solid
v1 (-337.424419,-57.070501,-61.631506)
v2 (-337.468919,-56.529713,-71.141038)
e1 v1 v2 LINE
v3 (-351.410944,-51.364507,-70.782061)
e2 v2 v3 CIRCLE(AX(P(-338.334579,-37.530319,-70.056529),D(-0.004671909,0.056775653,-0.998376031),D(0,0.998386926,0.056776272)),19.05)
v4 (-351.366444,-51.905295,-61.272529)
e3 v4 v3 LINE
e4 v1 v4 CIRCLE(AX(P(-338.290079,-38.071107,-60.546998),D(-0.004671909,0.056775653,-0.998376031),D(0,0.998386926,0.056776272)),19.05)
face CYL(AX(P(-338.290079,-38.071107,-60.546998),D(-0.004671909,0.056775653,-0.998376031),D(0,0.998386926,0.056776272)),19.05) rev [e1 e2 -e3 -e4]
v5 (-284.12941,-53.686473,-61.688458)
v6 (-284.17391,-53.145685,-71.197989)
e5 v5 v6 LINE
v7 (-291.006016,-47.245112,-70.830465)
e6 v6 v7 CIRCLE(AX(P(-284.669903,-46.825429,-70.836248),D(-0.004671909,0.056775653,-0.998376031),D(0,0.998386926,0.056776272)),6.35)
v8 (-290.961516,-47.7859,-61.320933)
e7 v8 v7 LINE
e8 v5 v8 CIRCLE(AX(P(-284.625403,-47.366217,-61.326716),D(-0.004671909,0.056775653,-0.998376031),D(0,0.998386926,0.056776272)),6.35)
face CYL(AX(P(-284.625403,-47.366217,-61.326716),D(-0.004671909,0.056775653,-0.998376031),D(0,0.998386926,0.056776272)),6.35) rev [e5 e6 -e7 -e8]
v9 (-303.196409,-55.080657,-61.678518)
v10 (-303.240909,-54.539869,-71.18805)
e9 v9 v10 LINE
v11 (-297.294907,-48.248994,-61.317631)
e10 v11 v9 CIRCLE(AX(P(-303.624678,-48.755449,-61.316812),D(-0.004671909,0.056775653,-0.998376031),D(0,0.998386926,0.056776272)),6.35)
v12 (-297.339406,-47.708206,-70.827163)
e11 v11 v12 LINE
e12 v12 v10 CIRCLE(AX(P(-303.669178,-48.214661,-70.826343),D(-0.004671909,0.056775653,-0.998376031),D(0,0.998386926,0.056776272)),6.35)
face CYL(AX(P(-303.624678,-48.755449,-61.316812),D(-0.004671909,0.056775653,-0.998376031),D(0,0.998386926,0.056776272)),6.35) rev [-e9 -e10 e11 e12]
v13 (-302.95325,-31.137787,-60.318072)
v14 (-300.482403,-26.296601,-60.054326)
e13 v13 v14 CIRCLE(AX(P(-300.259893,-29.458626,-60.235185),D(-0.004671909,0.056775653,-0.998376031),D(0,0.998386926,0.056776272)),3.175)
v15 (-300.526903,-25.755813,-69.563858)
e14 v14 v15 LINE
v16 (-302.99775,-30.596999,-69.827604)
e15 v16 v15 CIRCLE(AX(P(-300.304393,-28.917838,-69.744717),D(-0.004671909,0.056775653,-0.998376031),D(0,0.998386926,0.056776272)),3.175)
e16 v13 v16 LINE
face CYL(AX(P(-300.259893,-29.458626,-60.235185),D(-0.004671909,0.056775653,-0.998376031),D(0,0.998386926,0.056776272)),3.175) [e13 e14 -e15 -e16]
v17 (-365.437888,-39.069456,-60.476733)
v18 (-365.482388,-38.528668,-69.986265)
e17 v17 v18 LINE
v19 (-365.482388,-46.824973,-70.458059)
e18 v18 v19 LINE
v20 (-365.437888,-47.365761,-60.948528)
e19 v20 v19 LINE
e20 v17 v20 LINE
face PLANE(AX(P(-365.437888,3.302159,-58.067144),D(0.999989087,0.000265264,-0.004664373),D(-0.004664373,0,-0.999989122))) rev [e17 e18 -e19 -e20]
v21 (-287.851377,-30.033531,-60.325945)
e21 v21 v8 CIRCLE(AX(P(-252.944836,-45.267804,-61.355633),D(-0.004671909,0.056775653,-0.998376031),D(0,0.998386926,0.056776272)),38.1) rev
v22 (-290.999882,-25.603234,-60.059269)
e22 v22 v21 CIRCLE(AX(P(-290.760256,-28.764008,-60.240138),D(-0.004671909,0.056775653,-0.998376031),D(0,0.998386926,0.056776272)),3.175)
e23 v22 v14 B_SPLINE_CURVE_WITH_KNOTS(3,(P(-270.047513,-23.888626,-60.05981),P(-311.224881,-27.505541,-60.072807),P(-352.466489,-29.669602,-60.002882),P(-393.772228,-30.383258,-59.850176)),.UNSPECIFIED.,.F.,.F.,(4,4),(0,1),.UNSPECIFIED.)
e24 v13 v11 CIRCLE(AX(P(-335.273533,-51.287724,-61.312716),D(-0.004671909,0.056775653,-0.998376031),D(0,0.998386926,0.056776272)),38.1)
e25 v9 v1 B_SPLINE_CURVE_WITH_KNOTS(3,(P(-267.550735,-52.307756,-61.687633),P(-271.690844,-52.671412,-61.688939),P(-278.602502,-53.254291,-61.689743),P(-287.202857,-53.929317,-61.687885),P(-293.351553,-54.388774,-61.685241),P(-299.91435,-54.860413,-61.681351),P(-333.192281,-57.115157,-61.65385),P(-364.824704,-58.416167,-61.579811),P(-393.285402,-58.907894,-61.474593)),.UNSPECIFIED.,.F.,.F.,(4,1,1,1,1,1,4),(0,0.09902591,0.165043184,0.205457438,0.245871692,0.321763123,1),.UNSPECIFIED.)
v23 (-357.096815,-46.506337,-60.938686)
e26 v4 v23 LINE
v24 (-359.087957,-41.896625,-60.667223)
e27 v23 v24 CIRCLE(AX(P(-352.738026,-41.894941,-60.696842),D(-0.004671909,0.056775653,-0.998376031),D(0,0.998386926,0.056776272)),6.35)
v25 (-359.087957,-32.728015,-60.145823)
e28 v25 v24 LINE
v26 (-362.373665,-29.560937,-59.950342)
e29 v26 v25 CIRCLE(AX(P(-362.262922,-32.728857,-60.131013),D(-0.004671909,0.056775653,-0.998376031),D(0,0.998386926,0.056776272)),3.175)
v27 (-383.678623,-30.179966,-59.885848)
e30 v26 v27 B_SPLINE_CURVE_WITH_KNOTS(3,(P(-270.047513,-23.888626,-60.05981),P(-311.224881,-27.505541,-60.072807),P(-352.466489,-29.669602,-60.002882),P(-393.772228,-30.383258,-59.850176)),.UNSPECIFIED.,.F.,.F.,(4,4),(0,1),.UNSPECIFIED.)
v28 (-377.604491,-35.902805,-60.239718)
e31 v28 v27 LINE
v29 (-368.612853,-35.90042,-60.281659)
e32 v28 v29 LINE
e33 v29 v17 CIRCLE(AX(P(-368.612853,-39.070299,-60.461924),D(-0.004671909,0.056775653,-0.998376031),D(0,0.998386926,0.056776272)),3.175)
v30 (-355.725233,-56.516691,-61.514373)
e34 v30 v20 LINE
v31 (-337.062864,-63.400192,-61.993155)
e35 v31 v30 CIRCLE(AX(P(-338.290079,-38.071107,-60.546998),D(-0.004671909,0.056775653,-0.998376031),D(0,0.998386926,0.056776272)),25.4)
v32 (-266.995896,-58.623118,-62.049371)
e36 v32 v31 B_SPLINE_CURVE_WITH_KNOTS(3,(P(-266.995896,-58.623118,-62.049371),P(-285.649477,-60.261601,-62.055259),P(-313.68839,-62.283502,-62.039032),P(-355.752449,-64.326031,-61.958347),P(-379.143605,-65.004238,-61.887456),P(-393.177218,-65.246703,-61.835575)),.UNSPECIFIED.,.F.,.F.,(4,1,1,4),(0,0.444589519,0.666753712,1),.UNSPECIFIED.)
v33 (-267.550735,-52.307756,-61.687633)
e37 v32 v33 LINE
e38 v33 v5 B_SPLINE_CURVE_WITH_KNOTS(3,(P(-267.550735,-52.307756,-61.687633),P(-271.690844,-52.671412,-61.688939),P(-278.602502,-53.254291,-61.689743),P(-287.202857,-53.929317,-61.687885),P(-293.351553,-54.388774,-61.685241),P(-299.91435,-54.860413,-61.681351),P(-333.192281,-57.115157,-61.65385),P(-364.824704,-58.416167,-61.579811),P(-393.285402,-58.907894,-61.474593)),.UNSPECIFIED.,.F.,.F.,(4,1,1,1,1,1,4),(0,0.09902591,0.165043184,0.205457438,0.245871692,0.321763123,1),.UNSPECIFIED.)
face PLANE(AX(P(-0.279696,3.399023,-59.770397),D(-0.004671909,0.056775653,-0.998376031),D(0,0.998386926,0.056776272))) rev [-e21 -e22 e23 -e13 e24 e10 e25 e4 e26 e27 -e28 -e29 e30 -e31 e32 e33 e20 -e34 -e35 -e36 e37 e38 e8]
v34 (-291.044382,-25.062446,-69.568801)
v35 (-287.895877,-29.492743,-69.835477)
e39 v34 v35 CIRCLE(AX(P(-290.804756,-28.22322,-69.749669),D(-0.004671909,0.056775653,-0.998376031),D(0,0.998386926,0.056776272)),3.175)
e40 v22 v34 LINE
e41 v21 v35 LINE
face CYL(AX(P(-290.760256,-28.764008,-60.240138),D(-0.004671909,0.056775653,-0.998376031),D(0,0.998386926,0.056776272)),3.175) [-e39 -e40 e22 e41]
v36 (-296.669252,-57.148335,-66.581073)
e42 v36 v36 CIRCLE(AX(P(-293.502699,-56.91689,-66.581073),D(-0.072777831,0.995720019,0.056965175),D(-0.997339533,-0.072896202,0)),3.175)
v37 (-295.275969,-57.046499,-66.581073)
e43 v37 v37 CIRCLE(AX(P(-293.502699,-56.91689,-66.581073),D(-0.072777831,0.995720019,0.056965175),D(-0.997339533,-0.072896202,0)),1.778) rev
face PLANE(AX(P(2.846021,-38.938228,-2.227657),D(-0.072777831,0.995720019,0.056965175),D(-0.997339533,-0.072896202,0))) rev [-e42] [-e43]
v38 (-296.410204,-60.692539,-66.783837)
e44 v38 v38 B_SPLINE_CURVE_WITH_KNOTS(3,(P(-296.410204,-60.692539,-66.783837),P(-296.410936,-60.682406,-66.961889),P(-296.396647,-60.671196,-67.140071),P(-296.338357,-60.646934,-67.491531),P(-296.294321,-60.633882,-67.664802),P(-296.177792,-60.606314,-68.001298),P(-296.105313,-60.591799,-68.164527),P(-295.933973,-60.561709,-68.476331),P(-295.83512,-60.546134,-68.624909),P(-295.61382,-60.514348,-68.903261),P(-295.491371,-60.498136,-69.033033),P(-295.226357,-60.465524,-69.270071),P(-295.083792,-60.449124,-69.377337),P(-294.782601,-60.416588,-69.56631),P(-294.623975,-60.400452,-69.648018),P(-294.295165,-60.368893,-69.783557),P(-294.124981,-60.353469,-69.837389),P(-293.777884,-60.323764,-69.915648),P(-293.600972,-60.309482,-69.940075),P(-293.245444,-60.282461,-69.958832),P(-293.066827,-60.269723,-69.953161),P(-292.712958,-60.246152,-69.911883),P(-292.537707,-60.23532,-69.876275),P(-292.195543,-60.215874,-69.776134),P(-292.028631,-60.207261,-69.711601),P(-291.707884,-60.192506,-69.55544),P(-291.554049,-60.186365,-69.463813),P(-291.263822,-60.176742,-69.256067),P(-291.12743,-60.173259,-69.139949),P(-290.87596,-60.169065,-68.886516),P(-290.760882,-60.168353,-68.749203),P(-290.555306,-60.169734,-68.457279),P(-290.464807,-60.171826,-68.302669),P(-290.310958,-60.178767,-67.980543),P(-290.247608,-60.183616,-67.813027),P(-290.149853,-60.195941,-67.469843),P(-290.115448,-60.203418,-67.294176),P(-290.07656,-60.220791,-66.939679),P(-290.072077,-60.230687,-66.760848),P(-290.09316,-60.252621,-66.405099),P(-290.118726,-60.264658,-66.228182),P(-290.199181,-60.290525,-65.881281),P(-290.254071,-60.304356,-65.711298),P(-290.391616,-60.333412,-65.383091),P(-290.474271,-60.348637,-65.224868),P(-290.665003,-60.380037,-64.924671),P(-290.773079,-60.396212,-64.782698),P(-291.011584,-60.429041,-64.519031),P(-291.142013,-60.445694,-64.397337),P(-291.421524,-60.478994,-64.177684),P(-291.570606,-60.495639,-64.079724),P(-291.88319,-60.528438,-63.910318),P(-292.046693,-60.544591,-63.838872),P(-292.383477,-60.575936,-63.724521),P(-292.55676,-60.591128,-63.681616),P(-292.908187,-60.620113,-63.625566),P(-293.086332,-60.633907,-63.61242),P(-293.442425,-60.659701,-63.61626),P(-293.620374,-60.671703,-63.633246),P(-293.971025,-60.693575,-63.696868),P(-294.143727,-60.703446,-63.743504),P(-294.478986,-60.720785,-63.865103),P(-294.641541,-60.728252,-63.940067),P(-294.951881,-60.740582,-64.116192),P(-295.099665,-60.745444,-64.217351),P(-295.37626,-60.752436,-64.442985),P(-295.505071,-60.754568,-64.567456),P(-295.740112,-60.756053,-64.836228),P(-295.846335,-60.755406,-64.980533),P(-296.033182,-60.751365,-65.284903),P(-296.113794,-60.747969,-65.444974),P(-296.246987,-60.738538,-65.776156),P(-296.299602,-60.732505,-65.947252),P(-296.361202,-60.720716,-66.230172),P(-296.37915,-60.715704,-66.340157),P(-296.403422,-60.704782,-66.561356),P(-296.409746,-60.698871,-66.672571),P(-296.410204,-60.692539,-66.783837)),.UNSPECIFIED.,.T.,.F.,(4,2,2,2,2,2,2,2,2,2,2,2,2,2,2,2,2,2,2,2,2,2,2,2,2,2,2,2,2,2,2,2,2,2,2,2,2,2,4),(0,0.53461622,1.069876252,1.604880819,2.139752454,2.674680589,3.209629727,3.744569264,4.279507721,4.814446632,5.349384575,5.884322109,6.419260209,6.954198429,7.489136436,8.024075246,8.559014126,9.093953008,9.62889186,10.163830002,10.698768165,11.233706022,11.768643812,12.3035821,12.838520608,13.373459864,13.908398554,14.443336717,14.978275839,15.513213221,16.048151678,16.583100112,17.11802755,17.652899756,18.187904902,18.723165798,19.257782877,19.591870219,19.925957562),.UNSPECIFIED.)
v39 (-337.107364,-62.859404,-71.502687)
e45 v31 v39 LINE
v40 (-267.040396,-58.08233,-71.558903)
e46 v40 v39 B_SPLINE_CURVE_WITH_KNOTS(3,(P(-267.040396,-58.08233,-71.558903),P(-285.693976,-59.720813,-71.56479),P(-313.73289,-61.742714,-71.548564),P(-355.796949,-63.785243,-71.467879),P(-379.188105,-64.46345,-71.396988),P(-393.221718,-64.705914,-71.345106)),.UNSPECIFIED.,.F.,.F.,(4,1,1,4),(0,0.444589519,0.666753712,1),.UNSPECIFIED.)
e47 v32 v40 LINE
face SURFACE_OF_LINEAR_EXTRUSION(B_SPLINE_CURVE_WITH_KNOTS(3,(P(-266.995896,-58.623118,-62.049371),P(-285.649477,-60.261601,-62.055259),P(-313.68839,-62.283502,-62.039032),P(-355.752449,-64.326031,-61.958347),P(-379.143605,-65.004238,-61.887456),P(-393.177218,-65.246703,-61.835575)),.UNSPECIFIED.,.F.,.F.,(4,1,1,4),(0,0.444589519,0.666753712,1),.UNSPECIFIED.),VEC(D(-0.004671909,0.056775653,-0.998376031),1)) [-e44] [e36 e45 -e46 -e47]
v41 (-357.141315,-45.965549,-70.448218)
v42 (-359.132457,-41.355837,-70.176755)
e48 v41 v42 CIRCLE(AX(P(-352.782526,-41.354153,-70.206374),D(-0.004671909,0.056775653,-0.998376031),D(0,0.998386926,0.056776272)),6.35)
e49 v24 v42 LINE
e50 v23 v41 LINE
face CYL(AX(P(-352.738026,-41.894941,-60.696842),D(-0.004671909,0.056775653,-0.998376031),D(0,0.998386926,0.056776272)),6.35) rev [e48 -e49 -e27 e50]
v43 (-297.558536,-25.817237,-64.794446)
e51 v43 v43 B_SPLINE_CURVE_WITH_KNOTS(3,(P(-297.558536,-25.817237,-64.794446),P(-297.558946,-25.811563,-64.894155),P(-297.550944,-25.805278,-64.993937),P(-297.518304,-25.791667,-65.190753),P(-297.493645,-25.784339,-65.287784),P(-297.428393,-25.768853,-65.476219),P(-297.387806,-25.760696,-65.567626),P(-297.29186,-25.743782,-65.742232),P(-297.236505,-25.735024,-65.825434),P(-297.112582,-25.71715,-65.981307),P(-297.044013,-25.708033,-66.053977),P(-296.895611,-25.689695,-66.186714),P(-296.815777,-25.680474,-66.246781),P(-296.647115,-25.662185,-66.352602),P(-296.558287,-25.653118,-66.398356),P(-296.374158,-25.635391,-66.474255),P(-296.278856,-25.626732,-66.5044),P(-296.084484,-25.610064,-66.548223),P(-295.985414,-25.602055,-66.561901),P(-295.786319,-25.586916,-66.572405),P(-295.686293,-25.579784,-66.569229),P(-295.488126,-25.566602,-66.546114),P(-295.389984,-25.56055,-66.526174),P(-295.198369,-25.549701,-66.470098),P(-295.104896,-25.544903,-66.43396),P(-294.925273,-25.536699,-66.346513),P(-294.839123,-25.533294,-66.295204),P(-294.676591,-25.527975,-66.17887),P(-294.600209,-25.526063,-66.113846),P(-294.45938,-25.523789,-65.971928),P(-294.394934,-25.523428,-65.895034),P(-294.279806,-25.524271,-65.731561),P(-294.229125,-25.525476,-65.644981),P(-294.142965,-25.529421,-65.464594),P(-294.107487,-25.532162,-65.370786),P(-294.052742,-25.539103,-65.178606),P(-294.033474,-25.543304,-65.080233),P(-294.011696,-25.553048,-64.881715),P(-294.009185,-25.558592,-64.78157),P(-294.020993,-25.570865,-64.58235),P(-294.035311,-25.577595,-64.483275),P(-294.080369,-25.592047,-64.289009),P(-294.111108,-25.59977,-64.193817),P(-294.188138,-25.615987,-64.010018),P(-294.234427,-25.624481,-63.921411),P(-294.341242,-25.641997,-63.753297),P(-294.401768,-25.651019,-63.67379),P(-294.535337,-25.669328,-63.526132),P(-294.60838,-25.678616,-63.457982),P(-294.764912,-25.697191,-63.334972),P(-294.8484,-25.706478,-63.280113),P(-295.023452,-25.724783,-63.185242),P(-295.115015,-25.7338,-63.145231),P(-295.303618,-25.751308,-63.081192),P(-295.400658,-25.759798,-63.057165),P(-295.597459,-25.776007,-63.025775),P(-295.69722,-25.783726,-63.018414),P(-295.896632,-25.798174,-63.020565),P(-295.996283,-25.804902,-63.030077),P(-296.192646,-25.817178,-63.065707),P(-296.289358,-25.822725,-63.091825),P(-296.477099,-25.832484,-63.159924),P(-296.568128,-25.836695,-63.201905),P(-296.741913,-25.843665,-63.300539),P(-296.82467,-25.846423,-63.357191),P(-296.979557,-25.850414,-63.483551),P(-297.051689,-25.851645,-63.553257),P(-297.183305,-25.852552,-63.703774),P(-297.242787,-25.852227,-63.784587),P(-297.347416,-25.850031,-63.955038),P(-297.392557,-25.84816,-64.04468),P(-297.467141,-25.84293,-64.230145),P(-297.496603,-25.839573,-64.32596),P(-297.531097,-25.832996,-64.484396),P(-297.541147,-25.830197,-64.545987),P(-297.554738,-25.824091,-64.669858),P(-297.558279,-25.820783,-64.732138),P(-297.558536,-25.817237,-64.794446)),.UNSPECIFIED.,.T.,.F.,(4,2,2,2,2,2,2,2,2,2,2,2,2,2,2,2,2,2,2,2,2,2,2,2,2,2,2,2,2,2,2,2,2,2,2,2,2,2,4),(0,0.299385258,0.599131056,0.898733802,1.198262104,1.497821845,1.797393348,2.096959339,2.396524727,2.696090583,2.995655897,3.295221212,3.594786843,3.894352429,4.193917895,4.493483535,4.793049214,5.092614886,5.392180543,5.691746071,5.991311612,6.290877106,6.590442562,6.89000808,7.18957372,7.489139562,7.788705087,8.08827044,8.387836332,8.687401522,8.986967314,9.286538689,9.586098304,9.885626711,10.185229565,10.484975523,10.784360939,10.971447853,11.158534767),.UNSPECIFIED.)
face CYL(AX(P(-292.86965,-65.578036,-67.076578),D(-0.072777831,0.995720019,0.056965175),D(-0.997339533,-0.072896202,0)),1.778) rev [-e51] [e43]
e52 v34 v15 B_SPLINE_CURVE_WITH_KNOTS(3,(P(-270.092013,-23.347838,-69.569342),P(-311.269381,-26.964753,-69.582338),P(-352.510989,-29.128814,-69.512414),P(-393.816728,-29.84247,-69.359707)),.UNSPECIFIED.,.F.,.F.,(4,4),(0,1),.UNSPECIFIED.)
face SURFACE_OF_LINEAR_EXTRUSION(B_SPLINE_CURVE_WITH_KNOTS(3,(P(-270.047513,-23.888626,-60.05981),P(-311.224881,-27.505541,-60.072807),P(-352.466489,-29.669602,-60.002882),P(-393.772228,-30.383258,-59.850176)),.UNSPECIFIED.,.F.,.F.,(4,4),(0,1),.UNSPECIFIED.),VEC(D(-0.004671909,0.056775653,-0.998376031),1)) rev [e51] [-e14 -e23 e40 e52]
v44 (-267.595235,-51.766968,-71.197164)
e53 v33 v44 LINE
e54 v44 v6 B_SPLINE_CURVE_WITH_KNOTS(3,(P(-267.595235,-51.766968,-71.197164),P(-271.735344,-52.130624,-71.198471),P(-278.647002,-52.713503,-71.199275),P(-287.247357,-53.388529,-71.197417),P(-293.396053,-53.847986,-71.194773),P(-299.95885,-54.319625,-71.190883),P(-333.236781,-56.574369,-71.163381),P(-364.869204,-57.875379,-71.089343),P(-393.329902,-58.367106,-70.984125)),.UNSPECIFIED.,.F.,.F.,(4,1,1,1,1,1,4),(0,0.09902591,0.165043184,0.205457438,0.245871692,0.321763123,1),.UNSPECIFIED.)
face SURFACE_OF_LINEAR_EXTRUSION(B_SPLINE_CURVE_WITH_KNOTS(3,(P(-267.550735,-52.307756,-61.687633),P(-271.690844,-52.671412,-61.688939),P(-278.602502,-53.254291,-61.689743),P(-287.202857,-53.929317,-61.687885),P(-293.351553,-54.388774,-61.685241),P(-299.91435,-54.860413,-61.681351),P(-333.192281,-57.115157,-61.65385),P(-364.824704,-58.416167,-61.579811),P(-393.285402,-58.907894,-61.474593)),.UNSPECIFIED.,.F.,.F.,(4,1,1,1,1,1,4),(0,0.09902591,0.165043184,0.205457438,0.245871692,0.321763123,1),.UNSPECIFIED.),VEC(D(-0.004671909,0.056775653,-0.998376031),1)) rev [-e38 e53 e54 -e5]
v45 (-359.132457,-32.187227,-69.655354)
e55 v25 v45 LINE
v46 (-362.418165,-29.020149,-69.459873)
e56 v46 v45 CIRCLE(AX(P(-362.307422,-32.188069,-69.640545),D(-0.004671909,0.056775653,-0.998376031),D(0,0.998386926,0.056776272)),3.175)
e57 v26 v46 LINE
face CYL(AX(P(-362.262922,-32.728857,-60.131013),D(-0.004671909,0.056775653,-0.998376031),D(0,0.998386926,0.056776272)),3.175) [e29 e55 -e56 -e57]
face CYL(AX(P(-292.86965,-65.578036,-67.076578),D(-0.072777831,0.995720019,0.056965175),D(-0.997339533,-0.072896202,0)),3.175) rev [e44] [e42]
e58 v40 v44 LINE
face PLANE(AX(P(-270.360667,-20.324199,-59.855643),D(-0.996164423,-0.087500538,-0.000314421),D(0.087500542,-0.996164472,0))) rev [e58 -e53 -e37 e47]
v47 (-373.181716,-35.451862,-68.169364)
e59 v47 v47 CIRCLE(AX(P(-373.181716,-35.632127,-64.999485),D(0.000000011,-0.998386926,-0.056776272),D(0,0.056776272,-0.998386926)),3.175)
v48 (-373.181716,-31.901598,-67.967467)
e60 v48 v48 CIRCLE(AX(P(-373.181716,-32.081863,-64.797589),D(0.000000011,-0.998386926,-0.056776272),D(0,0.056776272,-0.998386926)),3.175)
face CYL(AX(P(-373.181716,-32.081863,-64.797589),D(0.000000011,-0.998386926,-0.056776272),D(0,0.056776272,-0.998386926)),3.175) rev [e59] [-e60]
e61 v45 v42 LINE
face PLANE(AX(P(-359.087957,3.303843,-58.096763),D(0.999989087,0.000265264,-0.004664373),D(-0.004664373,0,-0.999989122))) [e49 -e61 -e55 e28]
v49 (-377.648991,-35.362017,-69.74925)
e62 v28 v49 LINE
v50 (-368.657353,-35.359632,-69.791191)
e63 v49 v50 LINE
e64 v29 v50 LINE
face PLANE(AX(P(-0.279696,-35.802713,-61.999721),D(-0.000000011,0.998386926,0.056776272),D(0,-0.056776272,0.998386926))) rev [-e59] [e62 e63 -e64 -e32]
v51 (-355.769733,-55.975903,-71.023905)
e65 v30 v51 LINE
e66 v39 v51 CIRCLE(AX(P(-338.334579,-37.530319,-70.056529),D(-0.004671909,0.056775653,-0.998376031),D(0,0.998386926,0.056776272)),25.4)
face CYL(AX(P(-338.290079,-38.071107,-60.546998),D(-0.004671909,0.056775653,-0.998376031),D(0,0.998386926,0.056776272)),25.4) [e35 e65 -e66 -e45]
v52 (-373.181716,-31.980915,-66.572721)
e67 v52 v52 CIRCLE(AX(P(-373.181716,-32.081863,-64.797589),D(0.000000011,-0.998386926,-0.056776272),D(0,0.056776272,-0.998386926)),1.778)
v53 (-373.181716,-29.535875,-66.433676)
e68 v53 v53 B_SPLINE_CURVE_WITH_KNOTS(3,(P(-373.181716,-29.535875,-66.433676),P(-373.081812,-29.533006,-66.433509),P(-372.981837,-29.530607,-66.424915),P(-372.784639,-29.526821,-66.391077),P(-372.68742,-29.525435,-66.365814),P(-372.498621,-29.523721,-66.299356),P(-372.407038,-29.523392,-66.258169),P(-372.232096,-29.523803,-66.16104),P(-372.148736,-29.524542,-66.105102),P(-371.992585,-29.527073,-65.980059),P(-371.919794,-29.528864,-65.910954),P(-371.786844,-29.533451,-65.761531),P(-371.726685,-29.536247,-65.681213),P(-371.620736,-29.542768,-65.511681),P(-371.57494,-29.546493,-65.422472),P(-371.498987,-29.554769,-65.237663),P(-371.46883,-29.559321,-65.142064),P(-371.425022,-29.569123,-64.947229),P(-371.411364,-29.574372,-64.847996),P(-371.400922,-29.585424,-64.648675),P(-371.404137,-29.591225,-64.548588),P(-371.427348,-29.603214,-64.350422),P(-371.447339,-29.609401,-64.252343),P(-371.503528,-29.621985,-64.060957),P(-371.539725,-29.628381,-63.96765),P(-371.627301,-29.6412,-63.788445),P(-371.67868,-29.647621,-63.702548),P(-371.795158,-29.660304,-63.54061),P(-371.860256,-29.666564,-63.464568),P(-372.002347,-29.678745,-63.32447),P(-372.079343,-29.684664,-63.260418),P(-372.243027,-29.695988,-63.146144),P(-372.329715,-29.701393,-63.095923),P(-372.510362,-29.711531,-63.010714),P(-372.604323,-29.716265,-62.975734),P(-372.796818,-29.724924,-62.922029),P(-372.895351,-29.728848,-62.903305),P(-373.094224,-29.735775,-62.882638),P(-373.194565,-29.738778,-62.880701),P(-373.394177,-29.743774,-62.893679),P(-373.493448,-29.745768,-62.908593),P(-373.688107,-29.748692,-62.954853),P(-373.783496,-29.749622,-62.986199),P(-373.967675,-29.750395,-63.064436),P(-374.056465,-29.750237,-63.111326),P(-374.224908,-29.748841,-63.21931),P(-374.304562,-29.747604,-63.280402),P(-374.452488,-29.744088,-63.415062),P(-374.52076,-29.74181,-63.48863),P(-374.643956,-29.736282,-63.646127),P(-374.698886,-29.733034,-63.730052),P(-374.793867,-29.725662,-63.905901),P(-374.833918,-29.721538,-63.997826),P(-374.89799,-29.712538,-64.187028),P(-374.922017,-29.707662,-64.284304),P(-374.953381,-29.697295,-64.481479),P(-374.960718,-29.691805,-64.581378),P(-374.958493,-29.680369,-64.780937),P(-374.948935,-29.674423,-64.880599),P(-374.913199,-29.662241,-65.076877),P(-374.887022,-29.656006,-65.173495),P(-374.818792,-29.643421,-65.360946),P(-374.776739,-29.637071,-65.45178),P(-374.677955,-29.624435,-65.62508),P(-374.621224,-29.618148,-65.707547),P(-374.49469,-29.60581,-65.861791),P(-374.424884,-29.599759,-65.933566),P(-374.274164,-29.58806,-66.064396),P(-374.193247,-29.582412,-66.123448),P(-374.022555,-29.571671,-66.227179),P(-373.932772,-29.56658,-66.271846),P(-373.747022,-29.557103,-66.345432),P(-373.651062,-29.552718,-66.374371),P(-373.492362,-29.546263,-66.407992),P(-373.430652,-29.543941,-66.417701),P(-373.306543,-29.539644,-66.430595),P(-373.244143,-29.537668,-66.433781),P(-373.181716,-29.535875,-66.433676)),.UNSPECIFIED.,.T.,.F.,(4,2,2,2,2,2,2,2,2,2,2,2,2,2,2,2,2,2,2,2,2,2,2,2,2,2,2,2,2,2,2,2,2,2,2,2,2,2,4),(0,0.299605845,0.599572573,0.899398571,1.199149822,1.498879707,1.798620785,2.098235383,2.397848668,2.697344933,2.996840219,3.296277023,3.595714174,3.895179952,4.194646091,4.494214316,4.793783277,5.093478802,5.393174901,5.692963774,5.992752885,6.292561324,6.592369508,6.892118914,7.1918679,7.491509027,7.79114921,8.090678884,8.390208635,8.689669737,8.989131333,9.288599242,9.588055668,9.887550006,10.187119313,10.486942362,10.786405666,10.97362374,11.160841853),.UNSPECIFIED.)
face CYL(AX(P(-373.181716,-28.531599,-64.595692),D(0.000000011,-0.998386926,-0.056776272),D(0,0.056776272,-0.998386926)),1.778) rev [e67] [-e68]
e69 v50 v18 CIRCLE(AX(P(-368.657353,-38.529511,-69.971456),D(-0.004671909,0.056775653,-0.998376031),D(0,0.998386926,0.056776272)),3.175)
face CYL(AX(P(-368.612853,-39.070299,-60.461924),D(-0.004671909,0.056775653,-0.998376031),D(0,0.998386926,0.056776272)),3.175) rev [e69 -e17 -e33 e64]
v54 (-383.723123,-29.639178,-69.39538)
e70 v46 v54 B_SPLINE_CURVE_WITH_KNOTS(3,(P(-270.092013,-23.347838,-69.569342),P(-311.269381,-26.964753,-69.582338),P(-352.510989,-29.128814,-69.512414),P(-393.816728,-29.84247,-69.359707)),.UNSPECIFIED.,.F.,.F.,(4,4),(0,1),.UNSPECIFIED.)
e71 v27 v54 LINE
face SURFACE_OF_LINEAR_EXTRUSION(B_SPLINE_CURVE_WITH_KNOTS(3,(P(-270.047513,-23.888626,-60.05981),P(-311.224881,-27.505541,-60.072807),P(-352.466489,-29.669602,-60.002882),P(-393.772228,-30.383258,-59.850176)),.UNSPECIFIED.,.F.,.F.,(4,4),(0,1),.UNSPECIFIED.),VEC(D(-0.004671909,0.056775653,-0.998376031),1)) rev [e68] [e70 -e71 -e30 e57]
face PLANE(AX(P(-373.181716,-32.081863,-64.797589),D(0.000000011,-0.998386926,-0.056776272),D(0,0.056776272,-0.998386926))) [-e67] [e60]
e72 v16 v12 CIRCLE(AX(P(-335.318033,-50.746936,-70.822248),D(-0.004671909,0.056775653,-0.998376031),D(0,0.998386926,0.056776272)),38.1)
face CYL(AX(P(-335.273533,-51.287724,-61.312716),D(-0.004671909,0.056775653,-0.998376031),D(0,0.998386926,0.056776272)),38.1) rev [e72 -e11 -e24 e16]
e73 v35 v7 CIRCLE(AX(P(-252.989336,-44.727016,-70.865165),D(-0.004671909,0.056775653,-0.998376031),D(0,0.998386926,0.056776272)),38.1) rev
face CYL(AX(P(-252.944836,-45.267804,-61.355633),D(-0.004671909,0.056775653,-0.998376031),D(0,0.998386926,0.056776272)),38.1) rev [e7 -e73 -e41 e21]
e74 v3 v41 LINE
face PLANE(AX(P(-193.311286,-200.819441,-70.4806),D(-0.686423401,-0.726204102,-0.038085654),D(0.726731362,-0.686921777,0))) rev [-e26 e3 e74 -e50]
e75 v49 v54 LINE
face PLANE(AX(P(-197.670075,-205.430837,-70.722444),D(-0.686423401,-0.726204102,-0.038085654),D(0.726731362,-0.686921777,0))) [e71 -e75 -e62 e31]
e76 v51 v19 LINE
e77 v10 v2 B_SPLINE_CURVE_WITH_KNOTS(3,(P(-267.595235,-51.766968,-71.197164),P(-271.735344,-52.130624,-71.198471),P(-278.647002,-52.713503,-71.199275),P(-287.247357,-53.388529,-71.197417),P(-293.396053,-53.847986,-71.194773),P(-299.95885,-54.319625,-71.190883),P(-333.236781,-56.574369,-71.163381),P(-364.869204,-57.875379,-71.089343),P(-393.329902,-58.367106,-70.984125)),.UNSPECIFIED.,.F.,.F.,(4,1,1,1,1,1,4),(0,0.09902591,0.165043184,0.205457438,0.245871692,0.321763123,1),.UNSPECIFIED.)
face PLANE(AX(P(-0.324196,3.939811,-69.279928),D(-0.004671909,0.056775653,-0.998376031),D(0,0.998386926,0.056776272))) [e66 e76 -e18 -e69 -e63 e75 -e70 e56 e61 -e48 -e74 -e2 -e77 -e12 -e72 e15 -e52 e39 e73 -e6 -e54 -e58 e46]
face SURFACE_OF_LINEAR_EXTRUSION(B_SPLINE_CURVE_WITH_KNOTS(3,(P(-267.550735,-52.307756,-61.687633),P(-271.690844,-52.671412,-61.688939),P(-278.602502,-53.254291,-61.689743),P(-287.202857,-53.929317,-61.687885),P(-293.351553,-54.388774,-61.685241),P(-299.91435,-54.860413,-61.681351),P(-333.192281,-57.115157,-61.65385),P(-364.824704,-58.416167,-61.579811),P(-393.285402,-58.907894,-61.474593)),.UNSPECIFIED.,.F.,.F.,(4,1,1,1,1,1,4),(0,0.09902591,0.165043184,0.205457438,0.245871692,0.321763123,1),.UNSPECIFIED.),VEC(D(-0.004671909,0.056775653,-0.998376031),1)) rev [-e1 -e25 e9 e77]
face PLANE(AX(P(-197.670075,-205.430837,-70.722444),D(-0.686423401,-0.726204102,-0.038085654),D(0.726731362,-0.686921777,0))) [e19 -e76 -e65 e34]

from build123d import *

# Parameters (mm, degrees)
BOSS_EXTRUDE1_START     = -4.7625
BOSS_EXTRUDE1_DEPTH     = 9.525
SKETCH4_R               = 3.175
CUT_EXTRUDE1_DEPTH      = 3.556
SKETCH5_R               = 1.778
CUT_EXTRUDE2_DEPTH      = 3.556
SKETCH6_R               = 1.778
CUT_EXTRUDE3_DEPTH      = 395.764920194
CUT_EXTRUDE4_DEPTH      = 3.556
CUT_EXTRUDE4_DEPTH_BACK = 394.514669922
SKETCH7_R               = 3.175
SKETCH7_R_2             = 1.778


# Read off the part's stored shape, not the designer's step: Boss-Extrude1
with BuildPart() as part:
    # Boss-Extrude1 outline → Boss-Extrude1 (new body)
    with BuildSketch(Plane(origin=(-0.301955496, 3.66953177, -64.525155836), x_dir=(-0.9999890865713076, -0.0002652643419205306, 0.004664372745720222), z_dir=(-0.004671909489919135, 0.056775652550269534, -0.9983760306313494)).offset(BOSS_EXTRUDE1_START)):
        with BuildLine():
            ThreePointArc((351.090571083, -55.300504742), (344.645589293, -59.305920537), (337.148393987, -60.477760333))
            add(Edge.make_bspline(
                [(302.92001028, -58.493795672), (304.509330321, -58.60122978), (315.913860098, -59.356827376), (327.324538226, -60.002876959), (337.148393987, -60.477760333)],
                knots=[0.283817359, 0.283817359, 0.283817359, 0.283817359, 0.321763123, 0.55608803, 0.55608803, 0.55608803, 0.55608803], degree=3))
            ThreePointArc((302.92001028, -58.493795672), (298.540134178, -56.306049329), (297.01844307, -51.652662937))
            ThreePointArc((297.01844307, -51.652662937), (298.817944258, -42.742557946), (302.676848033, -34.512306606))
            ThreePointArc((302.676848033, -34.512306606), (302.812285866, -31.389489502), (300.205974442, -29.663954561))
            add(Edge.make_bspline(
                [(290.723349608, -28.971987248), (293.88384664, -29.211203734), (297.044721601, -29.441859136), (300.205974442, -29.663954561)],
                knots=[0.169565869, 0.169565869, 0.169565869, 0.169565869, 0.246277706, 0.246277706, 0.246277706, 0.246277706], degree=3))
            ThreePointArc((290.723349608, -28.971987248), (287.894150829, -30.300881632), (287.574810624, -33.410278334))
            ThreePointArc((287.574810624, -33.410278334), (290.198038966, -42.113548005), (290.684983891, -51.190503181))
            ThreePointArc((290.684983891, -51.190503181), (288.503875799, -55.573685628), (283.852803221, -57.102425178))
            add(Edge.make_bspline(
                [(267.2739472, -55.725885072), (271.414101546, -56.089029226), (276.943487963, -56.55461635), (282.47093841, -56.994157025), (283.852803221, -57.102425178)],
                knots=[0, 0, 0, 0, 0.09902591, 0.132034547, 0.132034547, 0.132034547, 0.132034547], degree=3))
            Line((267.2739472, -55.725885072), (266.719101765, -62.051598198))
            add(Edge.make_bspline(
                [(266.719101765, -62.051598198), (285.372886056, -63.687772151), (308.740732669, -65.369335536), (332.113756278, -66.591725825), (336.786834388, -66.817774574)],
                knots=[0, 0, 0, 0, 0.444589519, 0.555671616, 0.555671616, 0.555671616, 0.555671616], degree=3))
            ThreePointArc((336.786834388, -66.817774574), (346.821832777, -65.271443631), (355.449407296, -59.918193219))
            Line((355.449407296, -59.918193219), (365.162167793, -50.749897782))
            Line((365.162167793, -50.749897782), (365.162167793, -42.440188824))
            ThreePointArc((365.162167793, -42.440188824), (366.092103763, -40.195124794), (368.337167793, -39.265188824))
            Line((368.337167793, -39.265188824), (377.328903503, -39.265188824))
            Line((377.328903503, -39.265188824), (383.403102119, -33.531489588))
            add(Edge.make_bspline(
                [(362.097911235, -32.917120768), (369.197743206, -33.164912437), (376.299473684, -33.369697882), (383.403102119, -33.531489588)],
                knots=[0.746516847, 0.746516847, 0.746516847, 0.746516847, 0.918535276, 0.918535276, 0.918535276, 0.918535276], degree=3))
            ThreePointArc((362.097911235, -32.917120768), (359.781604988, -33.806306666), (358.812167793, -36.090188824))
            Line((358.812167793, -36.090188824), (358.812167793, -45.273612359))
            ThreePointArc((358.812167793, -45.273612359), (358.293167277, -47.787960192), (356.821004007, -49.891300836))
            Line((356.821004007, -49.891300836), (351.090571083, -55.300504742))
        make_face()
    extrude(amount=BOSS_EXTRUDE1_DEPTH)

    # Sketch4 → Cut-Extrude1 (cut)
    with BuildSketch(Plane(origin=(4.22e-07, -39.201736636, -2.229324535), x_dir=(-1.0, -1.0737029140643802e-08, -6.106056819647095e-10), z_dir=(1.0754377437384831e-08, -0.9983869264530261, -0.056776272224230304))):
        with Locations(Location((373.181715938, 62.871576923, 0), (0, 0, 90))):
            Circle(SKETCH4_R)
    extrude(amount=-CUT_EXTRUDE1_DEPTH, mode=Mode.SUBTRACT)

    # Sketch5 → Cut-Extrude2 (cut)
    with BuildSketch(Plane(origin=(3.84e-07, -35.651472726, -2.027428111), x_dir=(-1.0, -1.0737029140643802e-08, -6.106056819647096e-10), z_dir=(1.0754377437384831e-08, -0.9983869264530261, -0.0567762722242303))):
        with Locations(Location((373.181715938, 62.871576923, 0), (0, 0, 90))):
            Circle(SKETCH5_R)
    extrude(amount=-CUT_EXTRUDE2_DEPTH, mode=Mode.SUBTRACT)

    # Sketch6 → Cut-Extrude3 (cut, through all)
    with BuildSketch(Plane(origin=(0.563052915, -7.70348677, -0.440716731), x_dir=(0.9973481775659092, 0.07265901361084529, 0.004156975710635213), z_dir=(-0.07277783114339942, 0.995720018948314, 0.05696517497236669))):
        with Locations(Location((-297.136682759, 63.2214344, 0), (0, 0, 180.238565242))):
            Circle(SKETCH6_R)
    extrude(amount=-CUT_EXTRUDE3_DEPTH, mode=Mode.SUBTRACT)

    # Sketch7 → Cut-Extrude4 (cut, two sides: drawn at the far end of the back side and taken through both)
    # profile 1 of 2: a face of its own
    with BuildSketch(Plane(origin=(3.104818668, -42.479008432, -2.430225467), x_dir=(0.9973481775659092, 0.07265901361084529, 0.004156975710635213), z_dir=(-0.07277783114339942, 0.995720018948314, 0.05696517497236669)).offset(-CUT_EXTRUDE4_DEPTH_BACK)):
        with Locations(Location((-297.136682759, 63.2214344, 0), (0, 0, 180.238565242))):
            Circle(SKETCH7_R)
        with Locations(Location((-297.136682759, 63.2214344, 0), (0, 0, 180.238565242))):
            Circle(SKETCH7_R_2, mode=Mode.SUBTRACT)
    # profile 2 of 2: a face of its own
    with BuildSketch(Plane(origin=(3.104818668, -42.479008432, -2.430225467), x_dir=(0.9973481775659092, 0.07265901361084529, 0.004156975710635213), z_dir=(-0.07277783114339942, 0.995720018948314, 0.05696517497236669)).offset(-CUT_EXTRUDE4_DEPTH_BACK)):
        with Locations(Location((-297.136682759, 63.2214344, 0), (0, 0, 180.238565242))):
            Circle(SKETCH7_R_2)
    extrude(amount=CUT_EXTRUDE4_DEPTH + CUT_EXTRUDE4_DEPTH_BACK, mode=Mode.SUBTRACT)


solid = part.part
